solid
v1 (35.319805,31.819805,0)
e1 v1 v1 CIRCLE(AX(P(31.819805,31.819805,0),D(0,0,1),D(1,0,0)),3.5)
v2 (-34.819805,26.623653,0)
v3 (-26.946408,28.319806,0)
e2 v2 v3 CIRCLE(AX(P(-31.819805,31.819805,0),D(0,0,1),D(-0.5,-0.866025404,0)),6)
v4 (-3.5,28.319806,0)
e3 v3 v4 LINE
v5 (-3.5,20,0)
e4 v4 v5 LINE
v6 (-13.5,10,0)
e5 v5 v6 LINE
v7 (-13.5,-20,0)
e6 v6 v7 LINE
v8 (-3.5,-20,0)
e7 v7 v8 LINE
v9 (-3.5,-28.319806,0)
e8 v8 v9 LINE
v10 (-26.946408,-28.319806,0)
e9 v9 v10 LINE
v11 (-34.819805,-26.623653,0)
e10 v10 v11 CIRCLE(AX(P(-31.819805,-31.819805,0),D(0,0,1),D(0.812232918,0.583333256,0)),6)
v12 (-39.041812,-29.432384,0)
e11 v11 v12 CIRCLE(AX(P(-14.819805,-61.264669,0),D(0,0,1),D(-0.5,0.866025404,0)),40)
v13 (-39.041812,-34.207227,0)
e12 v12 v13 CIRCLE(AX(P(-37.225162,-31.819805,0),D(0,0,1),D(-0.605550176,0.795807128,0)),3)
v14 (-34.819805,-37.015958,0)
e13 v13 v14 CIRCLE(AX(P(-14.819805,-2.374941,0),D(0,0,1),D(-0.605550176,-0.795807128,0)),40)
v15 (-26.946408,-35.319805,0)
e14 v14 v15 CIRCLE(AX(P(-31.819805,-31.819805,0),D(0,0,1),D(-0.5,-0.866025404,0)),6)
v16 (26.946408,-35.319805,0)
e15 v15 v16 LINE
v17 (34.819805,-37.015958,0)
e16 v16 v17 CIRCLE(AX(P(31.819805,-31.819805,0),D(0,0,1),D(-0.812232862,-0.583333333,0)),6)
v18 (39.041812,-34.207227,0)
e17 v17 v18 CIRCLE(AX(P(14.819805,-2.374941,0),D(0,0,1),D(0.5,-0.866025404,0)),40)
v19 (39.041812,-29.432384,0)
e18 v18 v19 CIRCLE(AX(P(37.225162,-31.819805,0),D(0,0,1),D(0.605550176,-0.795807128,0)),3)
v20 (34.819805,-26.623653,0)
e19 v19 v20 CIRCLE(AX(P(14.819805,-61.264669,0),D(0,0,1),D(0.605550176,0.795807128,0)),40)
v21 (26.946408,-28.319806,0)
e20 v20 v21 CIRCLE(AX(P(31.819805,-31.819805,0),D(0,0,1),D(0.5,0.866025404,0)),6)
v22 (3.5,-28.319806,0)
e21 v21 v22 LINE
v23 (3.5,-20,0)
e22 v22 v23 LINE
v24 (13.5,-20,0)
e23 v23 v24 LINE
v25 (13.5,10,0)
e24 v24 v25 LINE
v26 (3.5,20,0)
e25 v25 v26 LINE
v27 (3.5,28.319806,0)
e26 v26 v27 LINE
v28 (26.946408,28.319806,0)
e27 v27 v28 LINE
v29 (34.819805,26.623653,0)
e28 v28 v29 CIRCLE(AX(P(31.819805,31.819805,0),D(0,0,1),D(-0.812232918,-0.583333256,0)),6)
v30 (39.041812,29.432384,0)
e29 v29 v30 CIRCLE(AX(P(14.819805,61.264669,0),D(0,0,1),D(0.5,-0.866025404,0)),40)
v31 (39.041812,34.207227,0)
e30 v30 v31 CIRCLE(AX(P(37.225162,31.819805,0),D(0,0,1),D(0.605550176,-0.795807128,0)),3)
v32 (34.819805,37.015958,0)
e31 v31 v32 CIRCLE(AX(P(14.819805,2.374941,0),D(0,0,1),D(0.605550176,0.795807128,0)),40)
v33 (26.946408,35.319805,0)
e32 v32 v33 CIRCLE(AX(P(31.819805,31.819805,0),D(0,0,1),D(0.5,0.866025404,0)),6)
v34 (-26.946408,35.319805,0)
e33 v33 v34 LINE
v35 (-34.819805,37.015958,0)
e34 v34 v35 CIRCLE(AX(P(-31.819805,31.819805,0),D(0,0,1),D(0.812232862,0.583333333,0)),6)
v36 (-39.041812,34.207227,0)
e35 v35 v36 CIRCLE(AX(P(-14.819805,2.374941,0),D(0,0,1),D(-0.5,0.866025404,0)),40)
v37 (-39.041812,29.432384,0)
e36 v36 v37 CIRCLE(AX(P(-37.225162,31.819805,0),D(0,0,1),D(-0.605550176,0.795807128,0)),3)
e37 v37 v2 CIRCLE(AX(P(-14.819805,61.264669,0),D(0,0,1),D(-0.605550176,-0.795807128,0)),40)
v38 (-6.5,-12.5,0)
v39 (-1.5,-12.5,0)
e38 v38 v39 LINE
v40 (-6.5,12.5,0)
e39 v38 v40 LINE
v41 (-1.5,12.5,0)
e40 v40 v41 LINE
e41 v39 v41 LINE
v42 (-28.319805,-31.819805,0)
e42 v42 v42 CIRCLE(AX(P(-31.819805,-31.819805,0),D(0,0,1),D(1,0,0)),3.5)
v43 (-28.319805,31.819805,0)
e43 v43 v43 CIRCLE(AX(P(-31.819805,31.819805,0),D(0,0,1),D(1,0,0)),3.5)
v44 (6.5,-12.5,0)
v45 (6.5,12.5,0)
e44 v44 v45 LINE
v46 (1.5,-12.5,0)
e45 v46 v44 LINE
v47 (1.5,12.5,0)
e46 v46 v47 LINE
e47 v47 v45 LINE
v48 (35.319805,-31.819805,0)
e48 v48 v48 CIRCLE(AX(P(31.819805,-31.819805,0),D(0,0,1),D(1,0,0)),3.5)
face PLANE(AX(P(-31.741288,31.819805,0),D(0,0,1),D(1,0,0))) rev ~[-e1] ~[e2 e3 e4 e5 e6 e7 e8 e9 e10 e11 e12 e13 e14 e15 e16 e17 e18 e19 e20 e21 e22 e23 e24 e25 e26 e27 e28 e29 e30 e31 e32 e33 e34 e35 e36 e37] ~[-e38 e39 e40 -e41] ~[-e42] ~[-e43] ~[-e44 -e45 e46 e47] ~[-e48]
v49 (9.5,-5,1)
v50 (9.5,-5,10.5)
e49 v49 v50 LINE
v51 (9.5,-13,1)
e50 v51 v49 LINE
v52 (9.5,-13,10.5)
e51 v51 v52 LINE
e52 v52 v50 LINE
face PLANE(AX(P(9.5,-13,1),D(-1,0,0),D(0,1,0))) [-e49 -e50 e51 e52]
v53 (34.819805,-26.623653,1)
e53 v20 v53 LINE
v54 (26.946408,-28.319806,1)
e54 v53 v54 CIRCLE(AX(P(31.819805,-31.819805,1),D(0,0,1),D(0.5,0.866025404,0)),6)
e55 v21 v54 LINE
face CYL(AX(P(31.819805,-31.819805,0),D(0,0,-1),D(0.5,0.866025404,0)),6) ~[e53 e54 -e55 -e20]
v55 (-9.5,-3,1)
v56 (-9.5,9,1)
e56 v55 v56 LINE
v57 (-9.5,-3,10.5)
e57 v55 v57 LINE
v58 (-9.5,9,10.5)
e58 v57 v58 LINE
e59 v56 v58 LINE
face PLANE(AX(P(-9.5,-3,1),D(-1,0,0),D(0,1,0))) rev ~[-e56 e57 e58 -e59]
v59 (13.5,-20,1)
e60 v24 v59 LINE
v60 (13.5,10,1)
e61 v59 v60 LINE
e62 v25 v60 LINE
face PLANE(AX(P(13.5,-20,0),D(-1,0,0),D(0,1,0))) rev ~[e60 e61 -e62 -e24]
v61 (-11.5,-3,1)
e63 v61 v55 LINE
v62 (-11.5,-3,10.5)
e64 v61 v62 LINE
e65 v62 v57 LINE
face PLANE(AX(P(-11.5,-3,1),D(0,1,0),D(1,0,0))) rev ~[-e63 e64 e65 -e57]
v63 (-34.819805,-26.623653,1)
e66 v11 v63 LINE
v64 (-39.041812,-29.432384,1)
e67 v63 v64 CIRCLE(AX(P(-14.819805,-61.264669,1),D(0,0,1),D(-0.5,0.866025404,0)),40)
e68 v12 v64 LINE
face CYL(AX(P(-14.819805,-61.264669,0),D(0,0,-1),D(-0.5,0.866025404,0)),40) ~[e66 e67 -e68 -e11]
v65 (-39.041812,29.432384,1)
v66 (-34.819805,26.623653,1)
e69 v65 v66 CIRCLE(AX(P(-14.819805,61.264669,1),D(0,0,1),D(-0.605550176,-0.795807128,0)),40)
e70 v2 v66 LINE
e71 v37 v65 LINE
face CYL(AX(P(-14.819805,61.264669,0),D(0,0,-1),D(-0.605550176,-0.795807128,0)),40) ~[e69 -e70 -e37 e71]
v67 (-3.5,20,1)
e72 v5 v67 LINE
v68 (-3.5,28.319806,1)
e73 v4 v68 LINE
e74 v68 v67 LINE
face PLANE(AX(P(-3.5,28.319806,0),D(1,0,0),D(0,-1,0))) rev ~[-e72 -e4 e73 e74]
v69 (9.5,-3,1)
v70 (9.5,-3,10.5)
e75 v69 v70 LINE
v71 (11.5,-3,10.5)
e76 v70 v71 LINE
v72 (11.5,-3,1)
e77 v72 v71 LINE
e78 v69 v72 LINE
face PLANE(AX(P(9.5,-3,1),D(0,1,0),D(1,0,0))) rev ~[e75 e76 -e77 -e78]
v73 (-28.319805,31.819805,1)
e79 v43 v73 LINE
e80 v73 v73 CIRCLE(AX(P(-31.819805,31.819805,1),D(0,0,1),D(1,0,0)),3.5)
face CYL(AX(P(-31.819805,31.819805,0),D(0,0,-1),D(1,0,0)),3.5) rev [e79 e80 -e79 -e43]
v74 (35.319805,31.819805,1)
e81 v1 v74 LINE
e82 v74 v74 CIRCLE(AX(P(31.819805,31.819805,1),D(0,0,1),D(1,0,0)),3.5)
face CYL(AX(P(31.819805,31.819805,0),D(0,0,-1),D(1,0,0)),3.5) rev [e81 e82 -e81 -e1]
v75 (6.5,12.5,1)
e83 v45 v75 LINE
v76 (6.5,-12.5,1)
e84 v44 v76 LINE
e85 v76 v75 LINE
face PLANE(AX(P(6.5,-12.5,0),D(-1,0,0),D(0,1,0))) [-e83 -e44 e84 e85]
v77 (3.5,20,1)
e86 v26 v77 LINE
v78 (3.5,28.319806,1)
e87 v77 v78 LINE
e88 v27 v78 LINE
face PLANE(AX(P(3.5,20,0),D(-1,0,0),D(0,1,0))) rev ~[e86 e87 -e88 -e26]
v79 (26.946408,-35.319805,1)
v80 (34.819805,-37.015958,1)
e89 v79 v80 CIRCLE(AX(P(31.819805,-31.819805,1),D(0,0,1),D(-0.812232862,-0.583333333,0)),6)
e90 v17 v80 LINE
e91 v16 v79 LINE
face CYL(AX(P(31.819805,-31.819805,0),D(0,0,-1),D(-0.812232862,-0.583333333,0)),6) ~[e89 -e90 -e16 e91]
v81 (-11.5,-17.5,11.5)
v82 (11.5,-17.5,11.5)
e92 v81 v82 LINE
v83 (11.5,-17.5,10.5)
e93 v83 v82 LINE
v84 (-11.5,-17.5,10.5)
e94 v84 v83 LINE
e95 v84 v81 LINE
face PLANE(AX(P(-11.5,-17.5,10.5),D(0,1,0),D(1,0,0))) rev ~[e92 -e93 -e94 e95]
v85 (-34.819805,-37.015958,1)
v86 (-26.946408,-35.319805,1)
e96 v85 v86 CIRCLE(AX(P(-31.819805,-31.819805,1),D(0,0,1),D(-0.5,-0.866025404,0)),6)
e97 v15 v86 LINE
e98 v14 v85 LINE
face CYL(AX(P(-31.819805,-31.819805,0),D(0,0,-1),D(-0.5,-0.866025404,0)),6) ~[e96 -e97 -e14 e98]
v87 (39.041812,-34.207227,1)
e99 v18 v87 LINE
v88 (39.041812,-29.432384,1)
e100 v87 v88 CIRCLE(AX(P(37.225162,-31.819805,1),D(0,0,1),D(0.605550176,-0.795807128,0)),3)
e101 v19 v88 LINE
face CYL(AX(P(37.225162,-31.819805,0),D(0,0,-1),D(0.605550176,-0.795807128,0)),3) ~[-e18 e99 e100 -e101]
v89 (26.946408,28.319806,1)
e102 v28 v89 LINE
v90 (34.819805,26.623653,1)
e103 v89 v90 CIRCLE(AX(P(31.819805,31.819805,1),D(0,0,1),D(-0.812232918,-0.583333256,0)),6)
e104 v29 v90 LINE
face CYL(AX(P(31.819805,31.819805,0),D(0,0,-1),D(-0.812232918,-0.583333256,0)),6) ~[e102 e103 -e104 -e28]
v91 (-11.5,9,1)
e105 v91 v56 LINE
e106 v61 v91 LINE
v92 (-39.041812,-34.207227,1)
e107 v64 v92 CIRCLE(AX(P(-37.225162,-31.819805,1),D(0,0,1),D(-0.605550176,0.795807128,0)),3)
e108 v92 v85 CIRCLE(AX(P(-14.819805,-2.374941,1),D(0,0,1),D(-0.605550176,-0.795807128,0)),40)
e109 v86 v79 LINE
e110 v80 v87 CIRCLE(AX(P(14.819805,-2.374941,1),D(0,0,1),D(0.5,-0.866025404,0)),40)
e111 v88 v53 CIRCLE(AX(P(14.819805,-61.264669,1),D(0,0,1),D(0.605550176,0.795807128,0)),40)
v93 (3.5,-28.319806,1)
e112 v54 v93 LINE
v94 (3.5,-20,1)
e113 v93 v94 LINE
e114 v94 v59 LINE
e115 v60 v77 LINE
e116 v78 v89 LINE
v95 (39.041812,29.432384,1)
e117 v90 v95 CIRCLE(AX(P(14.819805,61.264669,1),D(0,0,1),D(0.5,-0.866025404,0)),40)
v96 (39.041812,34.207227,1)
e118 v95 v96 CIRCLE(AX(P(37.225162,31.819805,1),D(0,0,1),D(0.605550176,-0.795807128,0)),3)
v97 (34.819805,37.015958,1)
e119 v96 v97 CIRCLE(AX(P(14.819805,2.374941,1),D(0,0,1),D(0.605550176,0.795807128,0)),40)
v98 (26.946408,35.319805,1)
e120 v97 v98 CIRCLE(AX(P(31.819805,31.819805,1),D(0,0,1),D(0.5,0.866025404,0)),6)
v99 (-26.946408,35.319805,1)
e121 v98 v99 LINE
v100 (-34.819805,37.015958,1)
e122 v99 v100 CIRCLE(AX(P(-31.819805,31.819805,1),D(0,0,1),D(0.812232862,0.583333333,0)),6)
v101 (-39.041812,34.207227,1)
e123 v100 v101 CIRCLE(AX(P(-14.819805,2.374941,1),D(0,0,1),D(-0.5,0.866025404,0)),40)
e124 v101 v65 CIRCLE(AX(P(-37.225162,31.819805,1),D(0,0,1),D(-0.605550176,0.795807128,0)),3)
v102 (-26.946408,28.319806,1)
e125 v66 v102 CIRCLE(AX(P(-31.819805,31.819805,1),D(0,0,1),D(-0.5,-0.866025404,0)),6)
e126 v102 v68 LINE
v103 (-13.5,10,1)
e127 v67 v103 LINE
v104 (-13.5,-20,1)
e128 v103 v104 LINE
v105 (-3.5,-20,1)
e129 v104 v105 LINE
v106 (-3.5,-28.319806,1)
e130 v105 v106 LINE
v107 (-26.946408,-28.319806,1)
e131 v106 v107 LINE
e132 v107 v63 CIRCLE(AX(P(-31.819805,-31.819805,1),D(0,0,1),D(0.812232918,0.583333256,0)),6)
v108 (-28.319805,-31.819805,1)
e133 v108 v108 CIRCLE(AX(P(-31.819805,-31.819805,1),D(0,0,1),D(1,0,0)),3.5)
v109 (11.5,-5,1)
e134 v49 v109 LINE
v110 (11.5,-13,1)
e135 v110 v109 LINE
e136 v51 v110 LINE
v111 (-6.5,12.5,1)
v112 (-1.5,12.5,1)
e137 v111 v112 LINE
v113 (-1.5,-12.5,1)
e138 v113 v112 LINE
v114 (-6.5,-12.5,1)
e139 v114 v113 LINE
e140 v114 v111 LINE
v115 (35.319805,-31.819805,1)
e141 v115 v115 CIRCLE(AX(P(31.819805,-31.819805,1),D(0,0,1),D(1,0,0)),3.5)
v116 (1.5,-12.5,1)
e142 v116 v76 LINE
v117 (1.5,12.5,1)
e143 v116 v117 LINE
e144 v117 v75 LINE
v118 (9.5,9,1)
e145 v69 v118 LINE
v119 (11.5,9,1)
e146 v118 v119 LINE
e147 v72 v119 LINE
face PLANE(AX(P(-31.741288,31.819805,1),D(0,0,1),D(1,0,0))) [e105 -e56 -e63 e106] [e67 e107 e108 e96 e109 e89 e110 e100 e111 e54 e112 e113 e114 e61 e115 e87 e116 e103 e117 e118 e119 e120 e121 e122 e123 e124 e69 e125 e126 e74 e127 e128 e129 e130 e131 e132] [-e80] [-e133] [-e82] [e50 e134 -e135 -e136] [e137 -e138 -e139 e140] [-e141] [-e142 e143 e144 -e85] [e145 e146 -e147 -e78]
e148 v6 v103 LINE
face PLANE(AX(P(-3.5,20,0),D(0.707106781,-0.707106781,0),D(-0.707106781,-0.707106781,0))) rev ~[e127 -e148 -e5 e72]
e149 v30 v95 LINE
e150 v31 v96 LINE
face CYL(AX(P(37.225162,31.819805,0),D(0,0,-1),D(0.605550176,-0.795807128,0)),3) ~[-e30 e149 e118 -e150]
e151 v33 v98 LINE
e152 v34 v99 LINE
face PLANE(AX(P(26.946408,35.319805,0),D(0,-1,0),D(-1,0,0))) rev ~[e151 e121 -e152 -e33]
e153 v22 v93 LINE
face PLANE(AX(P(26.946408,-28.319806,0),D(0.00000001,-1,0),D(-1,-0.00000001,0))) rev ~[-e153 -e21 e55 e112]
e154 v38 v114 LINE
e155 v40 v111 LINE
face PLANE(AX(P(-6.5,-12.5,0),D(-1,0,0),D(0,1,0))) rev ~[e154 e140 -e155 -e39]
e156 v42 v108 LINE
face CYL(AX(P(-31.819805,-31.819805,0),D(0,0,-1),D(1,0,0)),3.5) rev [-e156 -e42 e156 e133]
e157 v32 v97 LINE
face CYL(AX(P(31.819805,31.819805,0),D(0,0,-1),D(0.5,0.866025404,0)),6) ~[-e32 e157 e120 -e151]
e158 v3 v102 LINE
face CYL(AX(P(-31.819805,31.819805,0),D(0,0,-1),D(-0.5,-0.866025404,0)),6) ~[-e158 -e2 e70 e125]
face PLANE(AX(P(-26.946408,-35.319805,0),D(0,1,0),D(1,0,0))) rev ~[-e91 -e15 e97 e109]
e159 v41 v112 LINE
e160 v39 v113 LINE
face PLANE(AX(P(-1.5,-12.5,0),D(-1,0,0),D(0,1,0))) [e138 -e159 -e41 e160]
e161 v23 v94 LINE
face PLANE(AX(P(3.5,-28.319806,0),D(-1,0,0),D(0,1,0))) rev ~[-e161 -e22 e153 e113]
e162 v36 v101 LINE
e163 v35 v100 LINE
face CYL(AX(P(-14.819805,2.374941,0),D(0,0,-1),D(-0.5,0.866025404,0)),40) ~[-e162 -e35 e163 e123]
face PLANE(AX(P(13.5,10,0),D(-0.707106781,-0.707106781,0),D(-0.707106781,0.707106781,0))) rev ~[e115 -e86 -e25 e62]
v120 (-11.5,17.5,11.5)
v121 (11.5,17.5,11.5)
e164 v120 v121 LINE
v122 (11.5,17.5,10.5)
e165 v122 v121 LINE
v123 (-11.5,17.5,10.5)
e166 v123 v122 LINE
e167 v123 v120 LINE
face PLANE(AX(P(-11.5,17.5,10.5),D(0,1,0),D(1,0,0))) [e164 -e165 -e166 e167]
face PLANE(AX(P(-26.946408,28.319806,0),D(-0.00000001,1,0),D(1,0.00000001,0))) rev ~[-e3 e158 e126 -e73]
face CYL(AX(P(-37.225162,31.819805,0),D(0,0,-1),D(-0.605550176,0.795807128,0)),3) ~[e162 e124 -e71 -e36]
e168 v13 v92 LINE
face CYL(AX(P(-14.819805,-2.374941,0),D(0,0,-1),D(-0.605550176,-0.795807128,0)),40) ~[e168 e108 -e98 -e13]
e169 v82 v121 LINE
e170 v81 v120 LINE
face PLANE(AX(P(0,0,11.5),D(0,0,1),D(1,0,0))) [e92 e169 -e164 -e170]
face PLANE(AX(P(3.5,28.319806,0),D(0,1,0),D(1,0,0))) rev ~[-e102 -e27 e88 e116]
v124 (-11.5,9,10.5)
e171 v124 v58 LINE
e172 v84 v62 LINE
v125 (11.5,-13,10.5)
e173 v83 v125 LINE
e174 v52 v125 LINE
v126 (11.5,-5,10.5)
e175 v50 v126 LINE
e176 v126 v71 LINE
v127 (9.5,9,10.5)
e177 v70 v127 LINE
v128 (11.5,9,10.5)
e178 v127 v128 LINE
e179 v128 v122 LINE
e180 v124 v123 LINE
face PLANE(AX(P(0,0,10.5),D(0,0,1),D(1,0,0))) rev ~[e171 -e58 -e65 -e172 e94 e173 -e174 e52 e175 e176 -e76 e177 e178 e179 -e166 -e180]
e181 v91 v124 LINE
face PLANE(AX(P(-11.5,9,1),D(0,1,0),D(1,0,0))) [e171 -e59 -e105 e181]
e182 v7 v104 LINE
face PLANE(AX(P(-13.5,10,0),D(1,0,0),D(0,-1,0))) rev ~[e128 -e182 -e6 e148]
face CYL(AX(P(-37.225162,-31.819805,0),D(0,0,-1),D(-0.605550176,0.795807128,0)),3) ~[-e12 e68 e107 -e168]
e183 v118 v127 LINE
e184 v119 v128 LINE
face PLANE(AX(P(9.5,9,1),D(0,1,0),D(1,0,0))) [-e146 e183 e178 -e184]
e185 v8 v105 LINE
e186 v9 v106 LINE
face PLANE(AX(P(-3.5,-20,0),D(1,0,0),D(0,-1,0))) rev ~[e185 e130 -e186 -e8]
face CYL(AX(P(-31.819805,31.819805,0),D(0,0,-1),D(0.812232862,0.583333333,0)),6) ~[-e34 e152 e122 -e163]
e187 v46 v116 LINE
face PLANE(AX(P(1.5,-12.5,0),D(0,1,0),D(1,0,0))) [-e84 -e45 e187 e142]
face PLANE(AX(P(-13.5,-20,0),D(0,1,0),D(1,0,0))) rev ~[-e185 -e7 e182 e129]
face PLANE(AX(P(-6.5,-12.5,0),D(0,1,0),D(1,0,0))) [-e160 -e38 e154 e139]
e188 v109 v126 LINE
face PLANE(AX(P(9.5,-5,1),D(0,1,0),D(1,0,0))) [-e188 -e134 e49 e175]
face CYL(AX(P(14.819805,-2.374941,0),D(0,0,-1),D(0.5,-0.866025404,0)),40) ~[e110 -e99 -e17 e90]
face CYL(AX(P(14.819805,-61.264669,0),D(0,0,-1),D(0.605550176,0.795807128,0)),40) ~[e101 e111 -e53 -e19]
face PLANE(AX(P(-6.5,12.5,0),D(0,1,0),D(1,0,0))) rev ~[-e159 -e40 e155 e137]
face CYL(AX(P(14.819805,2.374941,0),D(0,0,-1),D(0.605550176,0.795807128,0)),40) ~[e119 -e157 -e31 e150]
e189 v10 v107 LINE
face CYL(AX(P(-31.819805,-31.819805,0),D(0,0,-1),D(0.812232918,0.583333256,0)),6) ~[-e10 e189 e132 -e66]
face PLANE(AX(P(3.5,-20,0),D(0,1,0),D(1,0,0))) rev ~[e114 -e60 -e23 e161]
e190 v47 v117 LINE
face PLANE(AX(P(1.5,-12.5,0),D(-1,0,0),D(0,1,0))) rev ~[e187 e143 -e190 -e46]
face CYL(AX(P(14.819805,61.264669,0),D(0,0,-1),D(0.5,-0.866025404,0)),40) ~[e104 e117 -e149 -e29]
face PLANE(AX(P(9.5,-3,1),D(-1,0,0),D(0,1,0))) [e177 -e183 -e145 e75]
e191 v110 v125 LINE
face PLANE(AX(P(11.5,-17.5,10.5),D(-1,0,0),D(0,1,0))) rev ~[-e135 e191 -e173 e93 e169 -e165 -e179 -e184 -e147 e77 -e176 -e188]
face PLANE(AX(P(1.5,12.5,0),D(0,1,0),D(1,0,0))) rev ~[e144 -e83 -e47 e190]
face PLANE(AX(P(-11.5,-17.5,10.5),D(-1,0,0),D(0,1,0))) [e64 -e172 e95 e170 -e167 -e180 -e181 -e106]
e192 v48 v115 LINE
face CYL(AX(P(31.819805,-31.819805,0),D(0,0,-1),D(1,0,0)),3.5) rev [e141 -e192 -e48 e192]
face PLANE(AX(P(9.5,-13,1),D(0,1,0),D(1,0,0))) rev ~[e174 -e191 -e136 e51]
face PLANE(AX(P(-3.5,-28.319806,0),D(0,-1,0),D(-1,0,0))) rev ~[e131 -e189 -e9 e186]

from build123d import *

# Parameters (mm, degrees)
F0_R     = 3.5
F0_W     = 5
F0_H     = 25
F1_DEPTH = 1
F2_W     = 2
F2_H     = 12
F2_H_2   = 8
F3_DEPTH = 9.5
F4_W     = 23
F4_H     = 35
F5_DEPTH = 1


# Not quite as in the source:
# - ends of sketch curves that miss each other by under 0.0002 mm in the source are joined


with BuildPart() as f1:
    # F0 (on Top) → F1 (new body)
    with BuildSketch(Plane.XY):
        with BuildLine():
            ThreePointArc((-26.946407646, 28.3198056199), (-26.1083961747, 29.9813798822), (-25.8198051534, 31.8198051534))
            ThreePointArc((-25.8198051534, 31.8198051534), (-26.1083962627, 33.6582306979), (-26.946407981, 35.3198051534))
            ThreePointArc((-26.946407981, 35.3198051534), (-30.5562239326, 37.6852431164), (-34.8198051534, 37.0159575761))
            ThreePointArc((-34.8198051534, 37.0159575761), (-37.8198051534, 31.8198051534), (-34.8198051534, 26.6236527307))
            ThreePointArc((-34.8198051534, 26.6236527307), (-30.5562236518, 25.9543672508), (-26.946407646, 28.3198056199))
        make_face()
        with Locations((-31.8198051534, 31.8198051534)):
            Circle(F0_R, mode=Mode.SUBTRACT)
        with BuildLine():
            ThreePointArc((-26.946407981, 35.3198051534), (-26.1083962627, 33.6582306979), (-25.8198051534, 31.8198051534))
            ThreePointArc((-25.8198051534, 31.8198051534), (-26.1083961747, 29.9813798822), (-26.946407646, 28.3198056199))
            Line((-26.946407646, 28.3198056199), (-3.5, 28.3198058605))
            Line((-3.5, 28.3198058605), (-3.5, 20))
            Line((-3.5, 20), (-13.5, 10))
            Line((-13.5, 10), (-13.5, -20))
            Line((-13.5, -20), (-3.5, -20))
            Line((-3.5, -20), (-3.5, -28.3198058605))
            Line((-3.5, -28.3198058605), (-26.946407981, -28.3198058605))
            ThreePointArc((-26.946407981, -28.3198058605), (-26.1083961747, -29.9813798822), (-25.8198051534, -31.8198051534))
            ThreePointArc((-25.8198051534, -31.8198051534), (-26.1083962627, -33.6582306979), (-26.946407981, -35.3198051534))
            Line((-26.946407981, -35.3198051534), (26.946407981, -35.3198051534))
            ThreePointArc((26.946407981, -35.3198051534), (25.8198051534, -31.8198054406), (26.946407646, -28.3198056199))
            Line((26.946407646, -28.3198056199), (3.5, -28.3198058605))
            Line((3.5, -28.3198058605), (3.5, -20))
            Line((3.5, -20), (13.5, -20))
            Line((13.5, -20), (13.5, 10))
            Line((13.5, 10), (3.5, 20))
            Line((3.5, 20), (3.5, 28.3198058605))
            Line((3.5, 28.3198058605), (26.946407981, 28.3198058605))
            ThreePointArc((26.946407981, 28.3198058605), (25.8198051534, 31.8198054406), (26.946407981, 35.3198051534))
            Line((26.946407981, 35.3198051534), (-26.946407981, 35.3198051534))
        make_face()
        with Locations((-4, 0)):
            Rectangle(F0_W, F0_H, mode=Mode.SUBTRACT)
        with Locations((4, 0)):
            Rectangle(F0_W, F0_H, mode=Mode.SUBTRACT)
        with BuildLine():
            ThreePointArc((-34.8198051534, 26.6236527307), (-37.8198051534, 31.8198051534), (-34.8198051534, 37.0159575761))
            ThreePointArc((-34.8198051534, 37.0159575761), (-36.975362446, 35.6785640663), (-39.041812183, 34.2072265368))
            ThreePointArc((-39.041812183, 34.2072265368), (-40.2251616558, 31.8198051534), (-39.041812183, 29.43238377))
            ThreePointArc((-39.041812183, 29.43238377), (-36.975362446, 27.9610462405), (-34.8198051534, 26.6236527307))
        make_face()
        with BuildLine():
            ThreePointArc((34.8198051534, 37.0159575761), (30.5562239326, 37.6852431164), (26.946407981, 35.3198051534))
            ThreePointArc((26.946407981, 35.3198051534), (25.8198051534, 31.8198054406), (26.946407646, 28.3198056199))
            ThreePointArc((26.946407646, 28.3198056199), (30.5562236518, 25.9543672508), (34.8198051534, 26.6236527307))
            ThreePointArc((34.8198051534, 26.6236527307), (37.0159575761, 28.8198051534), (37.8198051534, 31.8198051534))
            ThreePointArc((37.8198051534, 31.8198051534), (37.0159575761, 34.8198051534), (34.8198051534, 37.0159575761))
        make_face()
        with Locations((31.8198051534, 31.8198051534)):
            Circle(F0_R, mode=Mode.SUBTRACT)
        with BuildLine():
            ThreePointArc((39.041812183, 34.2072265368), (36.975362446, 35.6785640663), (34.8198051534, 37.0159575761))
            ThreePointArc((34.8198051534, 37.0159575761), (37.0159575761, 34.8198051534), (37.8198051534, 31.8198051534))
            ThreePointArc((37.8198051534, 31.8198051534), (37.0159575761, 28.8198051534), (34.8198051534, 26.6236527307))
            ThreePointArc((34.8198051534, 26.6236527307), (36.975362446, 27.9610462405), (39.041812183, 29.43238377))
            ThreePointArc((39.041812183, 29.43238377), (40.2251616558, 31.8198051534), (39.041812183, 34.2072265368))
        make_face()
        with BuildLine():
            ThreePointArc((-25.8198051534, -31.8198051534), (-26.1083961747, -29.9813798822), (-26.946407646, -28.3198056199))
            ThreePointArc((-26.946407646, -28.3198056199), (-30.5562236518, -25.9543672508), (-34.8198051534, -26.6236527307))
            ThreePointArc((-34.8198051534, -26.6236527307), (-37.8198051534, -31.8198051534), (-34.8198051534, -37.0159575761))
            ThreePointArc((-34.8198051534, -37.0159575761), (-30.5562239326, -37.6852431164), (-26.946407981, -35.3198051534))
            ThreePointArc((-26.946407981, -35.3198051534), (-26.1083962627, -33.6582306979), (-25.8198051534, -31.8198051534))
        make_face()
        with Locations((-31.8198051534, -31.8198051534)):
            Circle(F0_R, mode=Mode.SUBTRACT)
        with BuildLine():
            ThreePointArc((-34.8198051534, -37.0159575761), (-37.8198051534, -31.8198051534), (-34.8198051534, -26.6236527307))
            ThreePointArc((-34.8198051534, -26.6236527307), (-36.975362446, -27.9610462405), (-39.041812183, -29.43238377))
            ThreePointArc((-39.041812183, -29.43238377), (-40.2251616558, -31.8198051534), (-39.041812183, -34.2072265368))
            ThreePointArc((-39.041812183, -34.2072265368), (-36.975362446, -35.6785640663), (-34.8198051534, -37.0159575761))
        make_face()
        with BuildLine():
            ThreePointArc((34.8198051534, -26.6236527307), (30.5562236518, -25.9543672508), (26.946407646, -28.3198056199))
            ThreePointArc((26.946407646, -28.3198056199), (25.8198051534, -31.8198054406), (26.946407981, -35.3198051534))
            ThreePointArc((26.946407981, -35.3198051534), (30.5562239326, -37.6852431164), (34.8198051534, -37.0159575761))
            ThreePointArc((34.8198051534, -37.0159575761), (37.0159575761, -34.8198051534), (37.8198051534, -31.8198051534))
            ThreePointArc((37.8198051534, -31.8198051534), (37.0159575761, -28.8198051534), (34.8198051534, -26.6236527307))
        make_face()
        with Locations((31.8198051534, -31.8198051534)):
            Circle(F0_R, mode=Mode.SUBTRACT)
        with BuildLine():
            ThreePointArc((39.041812183, -29.43238377), (36.975362446, -27.9610462405), (34.8198051534, -26.6236527307))
            ThreePointArc((34.8198051534, -26.6236527307), (37.0159575761, -28.8198051534), (37.8198051534, -31.8198051534))
            ThreePointArc((37.8198051534, -31.8198051534), (37.0159575761, -34.8198051534), (34.8198051534, -37.0159575761))
            ThreePointArc((34.8198051534, -37.0159575761), (36.975362446, -35.6785640663), (39.041812183, -34.2072265368))
            ThreePointArc((39.041812183, -34.2072265368), (40.2251616558, -31.8198051534), (39.041812183, -29.43238377))
        make_face()
    extrude(amount=F1_DEPTH)

    # F2 (on face) → F3 (join)
    with BuildSketch(Plane.XY.offset(1)):
        with Locations((-10.5, 3)):
            Rectangle(F2_W, F2_H)
        with Locations((10.5, 3)):
            Rectangle(F2_W, F2_H)
        with Locations((10.5, -9)):
            Rectangle(F2_W, F2_H_2)
    extrude(amount=F3_DEPTH)

    # F4 (on face) → F5 (join)
    with BuildSketch(Plane.XY.offset(10.5)):
        Rectangle(F4_W, F4_H)
    extrude(amount=F5_DEPTH)


solid = f1.part
